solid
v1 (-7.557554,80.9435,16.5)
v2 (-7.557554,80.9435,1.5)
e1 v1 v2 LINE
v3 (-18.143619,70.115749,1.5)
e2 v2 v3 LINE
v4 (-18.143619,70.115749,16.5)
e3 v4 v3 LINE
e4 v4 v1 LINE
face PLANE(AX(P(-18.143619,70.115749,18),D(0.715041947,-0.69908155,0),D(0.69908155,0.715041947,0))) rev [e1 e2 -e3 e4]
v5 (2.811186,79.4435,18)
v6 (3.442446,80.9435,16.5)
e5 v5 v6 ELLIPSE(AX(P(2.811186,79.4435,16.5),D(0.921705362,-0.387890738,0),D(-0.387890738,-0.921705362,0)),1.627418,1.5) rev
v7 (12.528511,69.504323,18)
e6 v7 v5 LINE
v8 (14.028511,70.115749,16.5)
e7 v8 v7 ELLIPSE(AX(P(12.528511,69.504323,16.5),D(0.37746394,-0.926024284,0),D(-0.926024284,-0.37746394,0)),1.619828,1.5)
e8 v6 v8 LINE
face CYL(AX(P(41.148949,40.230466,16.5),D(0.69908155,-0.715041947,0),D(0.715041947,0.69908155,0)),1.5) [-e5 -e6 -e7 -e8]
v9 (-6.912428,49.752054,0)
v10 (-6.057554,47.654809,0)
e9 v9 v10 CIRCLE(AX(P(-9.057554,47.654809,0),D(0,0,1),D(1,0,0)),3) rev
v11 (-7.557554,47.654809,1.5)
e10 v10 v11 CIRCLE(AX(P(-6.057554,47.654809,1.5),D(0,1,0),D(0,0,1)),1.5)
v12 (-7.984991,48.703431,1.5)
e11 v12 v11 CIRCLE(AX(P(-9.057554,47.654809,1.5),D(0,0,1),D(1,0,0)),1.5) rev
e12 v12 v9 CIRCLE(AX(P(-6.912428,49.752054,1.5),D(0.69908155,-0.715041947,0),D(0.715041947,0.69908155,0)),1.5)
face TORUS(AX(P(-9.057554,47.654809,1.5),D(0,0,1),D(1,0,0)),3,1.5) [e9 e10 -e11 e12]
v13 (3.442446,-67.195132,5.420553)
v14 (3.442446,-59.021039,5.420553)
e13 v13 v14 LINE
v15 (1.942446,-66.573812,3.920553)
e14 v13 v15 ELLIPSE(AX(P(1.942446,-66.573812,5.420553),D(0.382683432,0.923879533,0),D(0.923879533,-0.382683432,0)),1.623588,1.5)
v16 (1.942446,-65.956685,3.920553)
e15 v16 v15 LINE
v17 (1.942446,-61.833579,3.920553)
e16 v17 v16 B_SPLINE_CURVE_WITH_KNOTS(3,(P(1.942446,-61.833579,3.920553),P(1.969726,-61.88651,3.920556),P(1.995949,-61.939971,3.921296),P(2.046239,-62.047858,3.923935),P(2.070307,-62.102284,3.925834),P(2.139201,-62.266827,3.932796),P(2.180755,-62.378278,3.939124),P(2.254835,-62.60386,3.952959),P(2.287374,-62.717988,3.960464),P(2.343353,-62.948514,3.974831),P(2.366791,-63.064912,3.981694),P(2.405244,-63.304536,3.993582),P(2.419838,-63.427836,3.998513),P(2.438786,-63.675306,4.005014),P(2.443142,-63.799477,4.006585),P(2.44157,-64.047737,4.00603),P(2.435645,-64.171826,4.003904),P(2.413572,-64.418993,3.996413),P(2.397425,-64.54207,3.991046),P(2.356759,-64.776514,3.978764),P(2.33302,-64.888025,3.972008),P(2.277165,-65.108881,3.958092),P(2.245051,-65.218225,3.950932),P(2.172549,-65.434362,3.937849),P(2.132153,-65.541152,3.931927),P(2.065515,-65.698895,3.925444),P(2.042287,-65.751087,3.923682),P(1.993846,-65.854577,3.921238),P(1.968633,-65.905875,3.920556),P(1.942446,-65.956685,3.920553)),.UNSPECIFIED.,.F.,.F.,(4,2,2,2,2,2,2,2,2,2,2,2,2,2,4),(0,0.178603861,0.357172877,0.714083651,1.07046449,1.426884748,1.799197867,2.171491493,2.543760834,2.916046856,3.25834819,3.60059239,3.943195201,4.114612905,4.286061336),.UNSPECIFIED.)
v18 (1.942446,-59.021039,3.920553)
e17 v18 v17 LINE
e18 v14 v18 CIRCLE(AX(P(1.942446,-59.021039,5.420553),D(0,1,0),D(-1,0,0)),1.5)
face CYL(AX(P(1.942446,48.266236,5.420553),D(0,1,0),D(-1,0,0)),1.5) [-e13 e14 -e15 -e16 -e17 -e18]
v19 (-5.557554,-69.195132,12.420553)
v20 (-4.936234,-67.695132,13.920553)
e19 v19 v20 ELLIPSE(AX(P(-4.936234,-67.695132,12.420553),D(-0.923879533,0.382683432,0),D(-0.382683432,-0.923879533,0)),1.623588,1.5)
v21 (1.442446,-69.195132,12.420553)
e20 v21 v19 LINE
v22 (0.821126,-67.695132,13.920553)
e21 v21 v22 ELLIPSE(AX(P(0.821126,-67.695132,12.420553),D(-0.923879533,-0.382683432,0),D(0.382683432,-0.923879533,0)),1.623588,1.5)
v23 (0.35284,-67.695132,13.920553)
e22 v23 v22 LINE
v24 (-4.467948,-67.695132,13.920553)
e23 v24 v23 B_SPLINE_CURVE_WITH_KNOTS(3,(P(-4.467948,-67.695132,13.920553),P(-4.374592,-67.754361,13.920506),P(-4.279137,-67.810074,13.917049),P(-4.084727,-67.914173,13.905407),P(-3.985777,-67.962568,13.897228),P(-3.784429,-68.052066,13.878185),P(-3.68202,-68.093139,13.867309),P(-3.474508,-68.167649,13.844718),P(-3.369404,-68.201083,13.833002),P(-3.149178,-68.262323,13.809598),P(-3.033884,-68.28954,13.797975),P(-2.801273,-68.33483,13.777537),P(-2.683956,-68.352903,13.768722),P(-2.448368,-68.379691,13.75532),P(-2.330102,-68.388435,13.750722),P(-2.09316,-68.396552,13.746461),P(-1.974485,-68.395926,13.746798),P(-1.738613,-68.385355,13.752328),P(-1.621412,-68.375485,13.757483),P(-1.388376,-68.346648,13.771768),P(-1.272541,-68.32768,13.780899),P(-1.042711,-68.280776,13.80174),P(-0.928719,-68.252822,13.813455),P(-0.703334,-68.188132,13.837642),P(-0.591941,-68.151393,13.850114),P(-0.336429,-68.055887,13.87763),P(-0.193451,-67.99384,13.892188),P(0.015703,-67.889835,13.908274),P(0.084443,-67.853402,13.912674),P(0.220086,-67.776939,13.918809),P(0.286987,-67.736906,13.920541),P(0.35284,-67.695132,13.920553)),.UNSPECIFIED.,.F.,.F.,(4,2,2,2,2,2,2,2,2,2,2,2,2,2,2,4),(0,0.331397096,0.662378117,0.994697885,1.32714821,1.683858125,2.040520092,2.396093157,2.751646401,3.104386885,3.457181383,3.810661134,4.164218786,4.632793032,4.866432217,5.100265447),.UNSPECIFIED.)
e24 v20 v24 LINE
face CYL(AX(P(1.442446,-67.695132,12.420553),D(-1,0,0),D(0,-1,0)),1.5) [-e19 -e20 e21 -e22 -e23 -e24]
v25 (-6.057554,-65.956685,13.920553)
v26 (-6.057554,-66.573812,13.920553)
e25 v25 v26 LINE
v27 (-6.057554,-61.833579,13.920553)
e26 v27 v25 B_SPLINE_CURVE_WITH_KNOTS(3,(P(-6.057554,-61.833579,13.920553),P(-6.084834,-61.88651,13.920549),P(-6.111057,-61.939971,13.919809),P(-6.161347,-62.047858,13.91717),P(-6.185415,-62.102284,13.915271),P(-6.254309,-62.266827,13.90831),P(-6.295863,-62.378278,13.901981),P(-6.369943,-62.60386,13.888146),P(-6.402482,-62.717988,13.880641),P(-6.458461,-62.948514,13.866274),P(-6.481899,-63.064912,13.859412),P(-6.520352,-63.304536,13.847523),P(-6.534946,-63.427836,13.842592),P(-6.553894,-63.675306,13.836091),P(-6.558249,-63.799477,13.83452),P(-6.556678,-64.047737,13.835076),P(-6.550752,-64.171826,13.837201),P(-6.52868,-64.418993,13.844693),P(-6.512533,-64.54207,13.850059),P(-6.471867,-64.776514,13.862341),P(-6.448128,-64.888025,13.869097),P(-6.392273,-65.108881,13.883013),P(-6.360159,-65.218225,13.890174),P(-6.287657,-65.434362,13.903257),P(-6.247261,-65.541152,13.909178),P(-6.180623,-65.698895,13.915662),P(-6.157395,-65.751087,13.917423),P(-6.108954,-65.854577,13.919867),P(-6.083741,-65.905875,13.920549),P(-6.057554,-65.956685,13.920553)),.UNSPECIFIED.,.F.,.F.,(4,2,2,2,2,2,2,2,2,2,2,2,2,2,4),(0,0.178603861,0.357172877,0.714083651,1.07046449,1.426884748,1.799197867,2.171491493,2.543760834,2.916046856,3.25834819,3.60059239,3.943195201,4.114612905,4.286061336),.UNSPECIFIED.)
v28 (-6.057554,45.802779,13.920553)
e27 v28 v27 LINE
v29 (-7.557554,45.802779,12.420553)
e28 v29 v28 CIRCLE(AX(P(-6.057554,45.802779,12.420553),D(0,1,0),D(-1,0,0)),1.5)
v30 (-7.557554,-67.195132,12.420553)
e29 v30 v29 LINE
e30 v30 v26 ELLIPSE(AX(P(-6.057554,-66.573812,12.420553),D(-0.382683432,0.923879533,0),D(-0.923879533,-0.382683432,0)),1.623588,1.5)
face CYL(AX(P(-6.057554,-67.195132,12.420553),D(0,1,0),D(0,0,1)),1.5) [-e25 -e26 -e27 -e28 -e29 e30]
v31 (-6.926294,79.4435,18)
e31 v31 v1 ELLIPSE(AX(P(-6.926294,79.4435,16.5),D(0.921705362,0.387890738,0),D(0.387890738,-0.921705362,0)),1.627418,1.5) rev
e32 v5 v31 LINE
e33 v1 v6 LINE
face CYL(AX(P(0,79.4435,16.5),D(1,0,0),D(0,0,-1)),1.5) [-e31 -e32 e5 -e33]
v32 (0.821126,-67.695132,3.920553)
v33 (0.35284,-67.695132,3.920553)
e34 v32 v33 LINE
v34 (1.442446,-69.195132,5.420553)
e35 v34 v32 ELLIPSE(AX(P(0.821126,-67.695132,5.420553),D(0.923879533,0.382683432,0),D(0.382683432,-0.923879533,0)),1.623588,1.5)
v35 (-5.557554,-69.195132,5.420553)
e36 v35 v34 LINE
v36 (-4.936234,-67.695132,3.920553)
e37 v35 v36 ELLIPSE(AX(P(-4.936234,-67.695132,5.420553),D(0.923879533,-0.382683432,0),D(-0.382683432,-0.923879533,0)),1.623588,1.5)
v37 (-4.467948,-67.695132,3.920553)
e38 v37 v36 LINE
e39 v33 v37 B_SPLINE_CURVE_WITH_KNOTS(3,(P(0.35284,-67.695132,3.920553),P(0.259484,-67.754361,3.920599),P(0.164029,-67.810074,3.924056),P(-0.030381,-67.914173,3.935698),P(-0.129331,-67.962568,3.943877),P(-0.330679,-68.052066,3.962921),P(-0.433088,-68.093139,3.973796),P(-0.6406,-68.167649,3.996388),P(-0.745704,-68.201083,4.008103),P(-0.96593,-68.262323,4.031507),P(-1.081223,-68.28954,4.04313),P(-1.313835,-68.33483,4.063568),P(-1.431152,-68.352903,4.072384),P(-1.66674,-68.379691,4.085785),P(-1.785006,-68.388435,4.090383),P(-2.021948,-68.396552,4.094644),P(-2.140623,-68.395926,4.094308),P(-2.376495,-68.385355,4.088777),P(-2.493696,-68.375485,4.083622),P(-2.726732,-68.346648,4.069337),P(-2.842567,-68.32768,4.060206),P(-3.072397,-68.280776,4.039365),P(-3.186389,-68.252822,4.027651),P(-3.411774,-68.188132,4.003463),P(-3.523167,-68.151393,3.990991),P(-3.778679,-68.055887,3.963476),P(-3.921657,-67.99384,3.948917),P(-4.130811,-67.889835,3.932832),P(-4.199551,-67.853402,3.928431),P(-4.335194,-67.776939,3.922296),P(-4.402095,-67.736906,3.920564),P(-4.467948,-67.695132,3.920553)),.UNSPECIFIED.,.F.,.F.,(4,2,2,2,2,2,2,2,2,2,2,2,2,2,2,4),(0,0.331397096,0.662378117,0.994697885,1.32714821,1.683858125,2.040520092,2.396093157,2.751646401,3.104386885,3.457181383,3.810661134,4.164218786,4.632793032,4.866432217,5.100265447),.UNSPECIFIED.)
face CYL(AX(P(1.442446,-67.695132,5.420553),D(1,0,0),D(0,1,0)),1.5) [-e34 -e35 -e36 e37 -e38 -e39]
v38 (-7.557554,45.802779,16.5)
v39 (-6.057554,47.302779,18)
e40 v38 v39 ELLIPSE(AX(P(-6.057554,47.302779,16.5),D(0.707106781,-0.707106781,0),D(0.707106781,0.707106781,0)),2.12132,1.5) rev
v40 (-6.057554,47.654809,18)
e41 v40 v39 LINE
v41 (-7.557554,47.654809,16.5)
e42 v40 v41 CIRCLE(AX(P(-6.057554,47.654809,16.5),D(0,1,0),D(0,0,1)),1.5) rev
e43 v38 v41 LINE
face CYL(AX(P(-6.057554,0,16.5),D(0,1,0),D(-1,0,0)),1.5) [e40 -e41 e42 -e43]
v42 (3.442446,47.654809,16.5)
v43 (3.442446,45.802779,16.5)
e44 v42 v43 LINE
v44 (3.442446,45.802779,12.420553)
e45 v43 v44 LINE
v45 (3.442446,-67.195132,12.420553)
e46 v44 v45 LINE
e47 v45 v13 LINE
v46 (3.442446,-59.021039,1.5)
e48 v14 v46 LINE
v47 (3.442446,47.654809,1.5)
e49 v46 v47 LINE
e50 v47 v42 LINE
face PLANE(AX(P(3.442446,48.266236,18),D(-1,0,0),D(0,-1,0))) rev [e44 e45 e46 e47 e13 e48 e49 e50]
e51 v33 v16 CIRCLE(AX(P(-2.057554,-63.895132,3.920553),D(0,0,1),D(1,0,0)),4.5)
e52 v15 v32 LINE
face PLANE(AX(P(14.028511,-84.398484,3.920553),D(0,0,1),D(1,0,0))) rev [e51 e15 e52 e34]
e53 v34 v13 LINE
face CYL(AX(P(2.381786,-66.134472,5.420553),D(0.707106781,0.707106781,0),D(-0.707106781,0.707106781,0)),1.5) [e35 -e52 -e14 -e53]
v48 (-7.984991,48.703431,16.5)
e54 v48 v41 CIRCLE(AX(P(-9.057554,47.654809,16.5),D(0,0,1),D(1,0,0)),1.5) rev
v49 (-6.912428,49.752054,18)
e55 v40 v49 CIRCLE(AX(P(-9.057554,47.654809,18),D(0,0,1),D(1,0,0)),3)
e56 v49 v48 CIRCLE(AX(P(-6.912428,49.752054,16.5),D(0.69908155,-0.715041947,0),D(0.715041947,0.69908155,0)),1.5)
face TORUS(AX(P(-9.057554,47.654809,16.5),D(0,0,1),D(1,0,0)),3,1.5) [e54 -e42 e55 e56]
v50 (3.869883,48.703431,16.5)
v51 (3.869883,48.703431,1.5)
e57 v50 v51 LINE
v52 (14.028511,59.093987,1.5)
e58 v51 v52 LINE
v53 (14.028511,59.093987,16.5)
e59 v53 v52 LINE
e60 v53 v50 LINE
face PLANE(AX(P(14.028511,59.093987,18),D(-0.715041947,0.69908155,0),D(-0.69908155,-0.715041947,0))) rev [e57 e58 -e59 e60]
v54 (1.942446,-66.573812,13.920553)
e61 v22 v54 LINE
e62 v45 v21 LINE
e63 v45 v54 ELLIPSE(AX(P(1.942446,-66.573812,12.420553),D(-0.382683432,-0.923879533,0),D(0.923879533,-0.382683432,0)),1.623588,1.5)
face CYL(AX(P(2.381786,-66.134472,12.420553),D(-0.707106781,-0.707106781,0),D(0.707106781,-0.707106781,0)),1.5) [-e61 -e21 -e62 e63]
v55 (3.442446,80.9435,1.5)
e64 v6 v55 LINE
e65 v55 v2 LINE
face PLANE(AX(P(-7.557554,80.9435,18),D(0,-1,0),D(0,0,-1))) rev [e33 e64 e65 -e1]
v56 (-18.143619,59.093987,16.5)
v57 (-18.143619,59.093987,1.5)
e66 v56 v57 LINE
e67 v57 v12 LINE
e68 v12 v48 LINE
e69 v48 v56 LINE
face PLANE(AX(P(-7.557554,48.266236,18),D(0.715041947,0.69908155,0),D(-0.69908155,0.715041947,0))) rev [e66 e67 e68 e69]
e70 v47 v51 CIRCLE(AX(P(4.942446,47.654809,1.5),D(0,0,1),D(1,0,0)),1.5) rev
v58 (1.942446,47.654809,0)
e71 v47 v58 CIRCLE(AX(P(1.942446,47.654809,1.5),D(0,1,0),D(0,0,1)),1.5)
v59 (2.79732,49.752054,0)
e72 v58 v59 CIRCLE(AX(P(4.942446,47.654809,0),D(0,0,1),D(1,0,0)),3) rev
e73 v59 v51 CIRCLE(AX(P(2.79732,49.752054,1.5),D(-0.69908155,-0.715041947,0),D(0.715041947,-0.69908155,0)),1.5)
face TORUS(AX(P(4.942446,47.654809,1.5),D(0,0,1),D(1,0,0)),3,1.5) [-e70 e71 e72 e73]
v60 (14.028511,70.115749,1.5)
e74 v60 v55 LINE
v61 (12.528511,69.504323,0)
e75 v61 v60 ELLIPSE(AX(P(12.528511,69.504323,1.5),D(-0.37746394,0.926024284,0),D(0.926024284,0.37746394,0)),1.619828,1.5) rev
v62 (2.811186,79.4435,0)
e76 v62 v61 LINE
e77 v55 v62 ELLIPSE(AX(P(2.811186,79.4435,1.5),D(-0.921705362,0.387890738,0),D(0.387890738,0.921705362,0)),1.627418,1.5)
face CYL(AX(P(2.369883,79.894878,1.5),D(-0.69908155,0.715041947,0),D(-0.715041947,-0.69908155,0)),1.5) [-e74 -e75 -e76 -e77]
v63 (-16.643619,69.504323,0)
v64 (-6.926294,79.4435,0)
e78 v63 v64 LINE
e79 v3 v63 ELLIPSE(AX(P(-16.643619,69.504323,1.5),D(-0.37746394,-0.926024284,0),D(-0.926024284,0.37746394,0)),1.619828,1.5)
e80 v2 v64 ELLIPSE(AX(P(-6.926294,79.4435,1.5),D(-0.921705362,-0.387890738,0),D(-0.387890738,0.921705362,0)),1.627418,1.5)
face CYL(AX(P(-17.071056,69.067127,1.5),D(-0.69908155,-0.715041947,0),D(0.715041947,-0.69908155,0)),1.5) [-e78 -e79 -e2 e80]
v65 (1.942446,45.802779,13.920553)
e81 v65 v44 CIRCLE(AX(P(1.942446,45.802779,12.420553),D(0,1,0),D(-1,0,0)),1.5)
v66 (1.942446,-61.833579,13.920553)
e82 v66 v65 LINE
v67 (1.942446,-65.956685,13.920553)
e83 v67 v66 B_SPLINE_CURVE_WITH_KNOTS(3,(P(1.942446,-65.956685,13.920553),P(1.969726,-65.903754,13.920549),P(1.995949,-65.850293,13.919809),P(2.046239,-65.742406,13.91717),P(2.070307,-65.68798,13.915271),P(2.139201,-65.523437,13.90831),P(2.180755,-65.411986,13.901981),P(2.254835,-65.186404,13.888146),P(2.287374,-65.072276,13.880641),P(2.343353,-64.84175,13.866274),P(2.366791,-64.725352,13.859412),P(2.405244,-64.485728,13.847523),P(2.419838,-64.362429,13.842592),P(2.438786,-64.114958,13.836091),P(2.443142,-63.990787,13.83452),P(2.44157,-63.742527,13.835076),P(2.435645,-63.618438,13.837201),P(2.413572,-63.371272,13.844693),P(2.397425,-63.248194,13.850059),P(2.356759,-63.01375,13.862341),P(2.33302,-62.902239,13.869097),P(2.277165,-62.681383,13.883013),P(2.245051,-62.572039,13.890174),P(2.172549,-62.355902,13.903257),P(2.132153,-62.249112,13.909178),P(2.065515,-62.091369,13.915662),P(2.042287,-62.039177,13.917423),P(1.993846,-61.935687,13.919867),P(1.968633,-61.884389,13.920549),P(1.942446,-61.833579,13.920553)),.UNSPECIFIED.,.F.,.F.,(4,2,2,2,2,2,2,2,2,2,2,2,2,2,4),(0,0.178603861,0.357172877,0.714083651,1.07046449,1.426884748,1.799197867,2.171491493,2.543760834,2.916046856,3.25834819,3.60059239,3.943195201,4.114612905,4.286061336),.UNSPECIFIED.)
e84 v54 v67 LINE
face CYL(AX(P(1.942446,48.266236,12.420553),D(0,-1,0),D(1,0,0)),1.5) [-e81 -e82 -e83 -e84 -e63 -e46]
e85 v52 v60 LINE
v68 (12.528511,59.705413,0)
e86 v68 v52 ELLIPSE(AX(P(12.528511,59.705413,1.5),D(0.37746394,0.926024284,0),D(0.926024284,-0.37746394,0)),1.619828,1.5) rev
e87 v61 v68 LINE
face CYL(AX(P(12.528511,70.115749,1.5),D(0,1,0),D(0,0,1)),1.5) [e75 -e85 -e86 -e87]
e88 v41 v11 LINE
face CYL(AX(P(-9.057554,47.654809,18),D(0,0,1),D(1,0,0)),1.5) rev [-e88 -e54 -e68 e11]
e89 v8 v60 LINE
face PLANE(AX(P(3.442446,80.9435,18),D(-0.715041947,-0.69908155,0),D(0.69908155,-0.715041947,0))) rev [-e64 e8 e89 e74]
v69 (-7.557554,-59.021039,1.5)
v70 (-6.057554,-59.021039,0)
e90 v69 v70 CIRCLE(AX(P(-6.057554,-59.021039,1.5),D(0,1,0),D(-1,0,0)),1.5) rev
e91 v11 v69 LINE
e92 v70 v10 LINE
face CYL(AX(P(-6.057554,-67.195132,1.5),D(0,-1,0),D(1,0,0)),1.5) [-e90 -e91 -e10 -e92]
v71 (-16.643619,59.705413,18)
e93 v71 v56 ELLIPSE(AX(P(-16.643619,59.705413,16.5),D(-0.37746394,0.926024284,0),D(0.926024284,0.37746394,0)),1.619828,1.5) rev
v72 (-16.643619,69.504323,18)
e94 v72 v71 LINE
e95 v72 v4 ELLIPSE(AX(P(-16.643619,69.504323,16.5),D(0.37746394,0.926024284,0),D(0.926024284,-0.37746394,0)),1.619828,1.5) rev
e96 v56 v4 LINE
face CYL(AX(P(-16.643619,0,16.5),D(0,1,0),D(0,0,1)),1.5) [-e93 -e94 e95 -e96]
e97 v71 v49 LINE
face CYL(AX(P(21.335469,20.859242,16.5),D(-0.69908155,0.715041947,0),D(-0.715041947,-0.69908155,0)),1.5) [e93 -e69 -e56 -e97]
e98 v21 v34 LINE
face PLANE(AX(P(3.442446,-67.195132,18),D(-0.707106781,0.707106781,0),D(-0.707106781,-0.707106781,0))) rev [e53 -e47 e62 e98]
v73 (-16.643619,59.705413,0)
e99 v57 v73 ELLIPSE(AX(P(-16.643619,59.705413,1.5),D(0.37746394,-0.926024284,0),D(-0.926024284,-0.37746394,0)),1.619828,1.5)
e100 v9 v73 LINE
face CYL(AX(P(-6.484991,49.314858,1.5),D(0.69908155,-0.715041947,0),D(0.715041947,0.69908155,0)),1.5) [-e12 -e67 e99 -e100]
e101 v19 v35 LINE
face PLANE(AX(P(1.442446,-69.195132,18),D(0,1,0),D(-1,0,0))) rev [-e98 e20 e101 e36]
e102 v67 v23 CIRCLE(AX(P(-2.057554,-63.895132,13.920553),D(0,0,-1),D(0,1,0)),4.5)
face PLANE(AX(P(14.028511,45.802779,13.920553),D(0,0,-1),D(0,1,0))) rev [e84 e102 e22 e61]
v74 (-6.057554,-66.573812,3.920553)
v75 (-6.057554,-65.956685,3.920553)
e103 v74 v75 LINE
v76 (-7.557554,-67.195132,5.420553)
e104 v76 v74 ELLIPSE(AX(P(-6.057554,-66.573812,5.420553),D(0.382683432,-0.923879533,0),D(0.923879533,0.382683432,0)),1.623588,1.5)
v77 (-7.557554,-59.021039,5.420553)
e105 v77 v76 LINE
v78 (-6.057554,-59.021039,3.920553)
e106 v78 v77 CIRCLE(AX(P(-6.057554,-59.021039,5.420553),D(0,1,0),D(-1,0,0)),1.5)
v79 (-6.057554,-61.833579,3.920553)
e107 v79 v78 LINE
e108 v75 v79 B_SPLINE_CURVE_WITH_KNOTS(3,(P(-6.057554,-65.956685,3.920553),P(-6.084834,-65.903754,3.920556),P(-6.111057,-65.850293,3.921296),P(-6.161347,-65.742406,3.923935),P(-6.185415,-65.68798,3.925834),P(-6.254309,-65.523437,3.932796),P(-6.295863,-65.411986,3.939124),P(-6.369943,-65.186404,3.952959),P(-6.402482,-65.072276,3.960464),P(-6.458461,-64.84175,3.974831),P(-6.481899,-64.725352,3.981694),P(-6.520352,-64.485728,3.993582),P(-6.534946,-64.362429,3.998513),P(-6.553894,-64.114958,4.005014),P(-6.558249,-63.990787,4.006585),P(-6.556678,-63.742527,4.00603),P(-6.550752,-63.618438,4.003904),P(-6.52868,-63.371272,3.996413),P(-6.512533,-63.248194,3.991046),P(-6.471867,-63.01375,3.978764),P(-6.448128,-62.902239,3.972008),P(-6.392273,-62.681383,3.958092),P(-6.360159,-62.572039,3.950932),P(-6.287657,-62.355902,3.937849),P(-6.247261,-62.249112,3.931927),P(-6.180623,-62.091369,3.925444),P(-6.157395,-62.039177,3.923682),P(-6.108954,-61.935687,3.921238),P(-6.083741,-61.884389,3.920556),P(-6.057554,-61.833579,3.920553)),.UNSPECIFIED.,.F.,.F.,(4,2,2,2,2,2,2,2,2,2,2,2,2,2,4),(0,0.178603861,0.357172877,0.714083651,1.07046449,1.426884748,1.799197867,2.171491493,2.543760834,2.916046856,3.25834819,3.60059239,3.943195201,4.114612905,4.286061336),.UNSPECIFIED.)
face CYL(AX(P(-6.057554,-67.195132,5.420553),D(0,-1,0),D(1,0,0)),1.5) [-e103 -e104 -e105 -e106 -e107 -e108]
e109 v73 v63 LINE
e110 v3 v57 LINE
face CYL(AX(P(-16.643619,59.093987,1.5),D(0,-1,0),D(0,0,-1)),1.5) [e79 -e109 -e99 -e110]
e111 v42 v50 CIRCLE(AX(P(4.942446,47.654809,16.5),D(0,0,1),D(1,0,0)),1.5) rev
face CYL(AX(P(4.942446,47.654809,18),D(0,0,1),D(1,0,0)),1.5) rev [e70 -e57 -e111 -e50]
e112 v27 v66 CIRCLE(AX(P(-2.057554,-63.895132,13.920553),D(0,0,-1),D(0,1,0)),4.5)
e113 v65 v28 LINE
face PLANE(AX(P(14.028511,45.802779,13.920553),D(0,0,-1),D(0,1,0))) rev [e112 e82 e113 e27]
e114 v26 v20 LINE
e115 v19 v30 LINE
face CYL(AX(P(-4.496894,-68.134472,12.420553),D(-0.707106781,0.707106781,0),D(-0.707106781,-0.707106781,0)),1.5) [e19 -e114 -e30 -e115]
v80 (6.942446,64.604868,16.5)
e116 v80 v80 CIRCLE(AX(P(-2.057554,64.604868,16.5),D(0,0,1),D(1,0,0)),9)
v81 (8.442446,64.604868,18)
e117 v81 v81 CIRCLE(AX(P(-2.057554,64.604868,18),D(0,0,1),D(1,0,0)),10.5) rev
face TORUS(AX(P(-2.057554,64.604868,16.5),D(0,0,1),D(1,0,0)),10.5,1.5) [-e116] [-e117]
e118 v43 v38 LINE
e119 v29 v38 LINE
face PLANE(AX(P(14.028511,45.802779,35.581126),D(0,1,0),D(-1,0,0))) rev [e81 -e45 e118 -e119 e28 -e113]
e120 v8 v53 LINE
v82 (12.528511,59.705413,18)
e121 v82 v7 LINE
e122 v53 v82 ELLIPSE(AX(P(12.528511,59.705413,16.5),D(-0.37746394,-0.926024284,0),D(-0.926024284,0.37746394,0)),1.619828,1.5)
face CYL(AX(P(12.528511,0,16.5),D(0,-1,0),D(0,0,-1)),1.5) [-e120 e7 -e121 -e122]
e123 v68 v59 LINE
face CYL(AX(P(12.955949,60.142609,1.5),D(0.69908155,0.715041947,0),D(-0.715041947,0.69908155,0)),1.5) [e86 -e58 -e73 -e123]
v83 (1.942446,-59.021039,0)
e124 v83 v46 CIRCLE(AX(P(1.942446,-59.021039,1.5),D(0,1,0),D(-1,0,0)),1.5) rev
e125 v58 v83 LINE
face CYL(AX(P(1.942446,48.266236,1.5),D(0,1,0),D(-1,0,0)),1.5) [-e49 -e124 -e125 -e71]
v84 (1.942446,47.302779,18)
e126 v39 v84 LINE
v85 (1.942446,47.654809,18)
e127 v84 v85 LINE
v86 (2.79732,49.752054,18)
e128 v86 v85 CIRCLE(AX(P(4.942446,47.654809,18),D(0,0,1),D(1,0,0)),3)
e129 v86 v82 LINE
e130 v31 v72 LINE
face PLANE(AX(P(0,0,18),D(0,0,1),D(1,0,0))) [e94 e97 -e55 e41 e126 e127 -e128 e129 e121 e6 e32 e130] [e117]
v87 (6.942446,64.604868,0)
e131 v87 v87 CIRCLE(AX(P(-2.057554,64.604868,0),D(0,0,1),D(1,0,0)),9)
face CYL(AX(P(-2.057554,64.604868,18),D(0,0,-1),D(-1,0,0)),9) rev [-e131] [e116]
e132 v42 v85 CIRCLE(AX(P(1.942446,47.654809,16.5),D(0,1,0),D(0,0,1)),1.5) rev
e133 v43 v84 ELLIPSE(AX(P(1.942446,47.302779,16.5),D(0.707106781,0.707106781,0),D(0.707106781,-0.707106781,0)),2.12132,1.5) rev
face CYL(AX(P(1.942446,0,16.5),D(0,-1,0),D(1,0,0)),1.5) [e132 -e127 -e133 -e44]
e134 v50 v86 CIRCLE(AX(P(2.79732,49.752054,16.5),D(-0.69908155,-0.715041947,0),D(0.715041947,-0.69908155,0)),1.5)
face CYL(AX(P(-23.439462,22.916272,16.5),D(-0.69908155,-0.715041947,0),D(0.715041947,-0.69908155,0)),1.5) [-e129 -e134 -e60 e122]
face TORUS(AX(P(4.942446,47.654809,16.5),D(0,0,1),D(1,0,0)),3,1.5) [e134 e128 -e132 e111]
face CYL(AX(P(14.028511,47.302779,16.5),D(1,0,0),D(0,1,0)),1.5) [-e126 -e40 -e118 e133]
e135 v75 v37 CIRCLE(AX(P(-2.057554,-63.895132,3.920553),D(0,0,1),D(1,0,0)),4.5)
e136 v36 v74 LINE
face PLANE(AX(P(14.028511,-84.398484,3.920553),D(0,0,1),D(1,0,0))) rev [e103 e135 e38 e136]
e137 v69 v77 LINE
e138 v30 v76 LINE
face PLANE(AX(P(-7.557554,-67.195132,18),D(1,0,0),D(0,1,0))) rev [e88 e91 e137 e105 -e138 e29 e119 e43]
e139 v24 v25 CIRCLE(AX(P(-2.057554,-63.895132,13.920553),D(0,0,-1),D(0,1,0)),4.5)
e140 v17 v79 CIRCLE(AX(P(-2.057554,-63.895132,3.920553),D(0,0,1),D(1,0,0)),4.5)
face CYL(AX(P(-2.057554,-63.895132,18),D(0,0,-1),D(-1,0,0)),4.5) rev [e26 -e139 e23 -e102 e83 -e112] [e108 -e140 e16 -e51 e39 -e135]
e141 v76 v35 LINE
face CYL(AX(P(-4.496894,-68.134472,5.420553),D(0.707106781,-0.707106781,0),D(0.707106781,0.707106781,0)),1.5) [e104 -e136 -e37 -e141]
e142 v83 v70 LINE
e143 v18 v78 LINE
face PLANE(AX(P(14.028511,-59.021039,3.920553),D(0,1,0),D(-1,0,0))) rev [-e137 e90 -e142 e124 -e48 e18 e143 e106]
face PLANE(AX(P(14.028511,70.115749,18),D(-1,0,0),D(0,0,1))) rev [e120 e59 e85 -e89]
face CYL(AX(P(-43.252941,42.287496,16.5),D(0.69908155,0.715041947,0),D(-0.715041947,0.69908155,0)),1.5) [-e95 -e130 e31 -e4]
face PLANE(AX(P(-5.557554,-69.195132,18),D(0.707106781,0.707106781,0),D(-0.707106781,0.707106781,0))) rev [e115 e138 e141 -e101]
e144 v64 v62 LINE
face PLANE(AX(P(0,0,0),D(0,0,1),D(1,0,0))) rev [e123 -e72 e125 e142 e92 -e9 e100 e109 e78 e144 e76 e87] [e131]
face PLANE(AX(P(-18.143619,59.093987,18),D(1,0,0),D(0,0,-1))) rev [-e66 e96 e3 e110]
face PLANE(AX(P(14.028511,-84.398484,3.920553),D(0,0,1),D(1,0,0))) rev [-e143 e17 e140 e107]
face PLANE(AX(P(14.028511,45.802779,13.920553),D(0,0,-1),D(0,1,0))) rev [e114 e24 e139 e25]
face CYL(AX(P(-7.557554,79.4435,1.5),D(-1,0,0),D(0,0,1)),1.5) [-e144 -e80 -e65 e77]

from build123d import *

# Parameters (mm, degrees)
SKETCH1_R               = 9
SKETCH1_R_2             = 4.5
BOSS_EXTRUDE1_DEPTH     = 18
CUT_EXTRUDE1_DEPTH      = 86.684353416
CUT_EXTRUDE1_DEPTH_BACK = 86.684353416
FILLET1_R               = 1.5


with BuildPart() as part:
    # Sketch1 → Boss-Extrude1 (new body)
    with BuildSketch(Plane.XY):
        Polygon((-7.557553962, -67.195132078), (-7.557553962, 48.266235791), (-18.143619364, 59.093986602), (-18.143619364, 70.115749241), (-7.557553962, 80.943500052), (3.442446038, 80.943500052), (14.02851144, 70.115749241), (14.02851144, 59.093986602), (3.442446038, 48.266235791), (3.442446038, -67.195132078), (1.442446038, -69.195132078), (-5.557553962, -69.195132078), align=None)
        with Locations((-2.057553962, 64.604867922)):
            Circle(SKETCH1_R, mode=Mode.SUBTRACT)
        with Locations((-2.057553962, -63.895132078)):
            Circle(SKETCH1_R_2, mode=Mode.SUBTRACT)
    extrude(amount=BOSS_EXTRUDE1_DEPTH)

    # Sketch2 → Cut-Extrude1 (cut, two sides: drawn at the far end of the back side and taken through both)
    with BuildSketch(Plane.ZY.offset(7.557553962).offset(-CUT_EXTRUDE1_DEPTH_BACK)):
        Polygon((3.920552613, -84.398483755), (3.920552613, -59.021038695), (-18.582585697, -59.021038695), (-18.582585697, -119.504750135), (35.581125662, -119.504750135), (35.581125662, 45.802779434), (13.920552613, 45.802779434), (13.920552613, -84.398483755), align=None)
    extrude(amount=CUT_EXTRUDE1_DEPTH + CUT_EXTRUDE1_DEPTH_BACK, mode=Mode.SUBTRACT)

    # Fillet1
    # the kernel refuses this fillet: 1.5 mm, written as the material it adds along each edge
    with BuildSketch(Plane(origin=(3.442446038, 48.266235791, 0), x_dir=(0, -1, 0), z_dir=(0, 0, 1))) as fillet1_piece_1:
        with BuildLine():
            CenterArc((FILLET1_R * 0.407617755976, FILLET1_R), FILLET1_R, 225.646637005, 44.353362995)
            Line((-FILLET1_R * 0.291463794008, FILLET1_R * 0.284958052649), (0, 0))
            Line((0, 0), (FILLET1_R * 0.407617755976, 0))
        make_face()
    extrude(amount=18)
    with BuildSketch(Plane(origin=(-7.557553962, 48.266235791, 0), x_dir=(0, -1, 0), z_dir=(0, 0, 1))) as fillet1_piece_2:
        with BuildLine():
            CenterArc((FILLET1_R * 0.407617755976, -FILLET1_R), FILLET1_R, 90, 44.353362995)
            Line((-FILLET1_R * 0.291463794008, -FILLET1_R * 0.284958052649), (0, 0))
            Line((0, 0), (FILLET1_R * 0.407617755976, 0))
        make_face()
    extrude(amount=18)
    # the kernel refuses this fillet: 1.5 mm, written as the material it takes off along each edge
    with BuildSketch(Plane(origin=(-18.143619364, 55.343986602, 0), x_dir=(1, 0, 0), z_dir=(0, 1, 0)), Plane(origin=(14.02851144, 73.865749241, 0), x_dir=(-1, 0, 0), z_dir=(0, -1, 0))) as fillet1_2_piece_1:
        with BuildLine():
            CenterArc((FILLET1_R, -FILLET1_R), FILLET1_R, 90, 90)
            Line((0, -FILLET1_R), (0, 0))
            Line((0, 0), (FILLET1_R, 0))
        make_face()
    extrude(amount=18.521762639, mode=Mode.SUBTRACT)
    with BuildSketch(Plane(origin=(-20.765175176, 67.434341939, 0), x_dir=(0.7150419473513874, -0.6990815499839313, 0), z_dir=(0.6990815499839312, 0.7150419473513874, 0)), Plane(origin=(0.820890226, 83.624907355, 0), x_dir=(-0.7150419473513874, -0.6990815499839313, 0), z_dir=(0.6990815499839312, -0.7150419473513874, 0))) as fillet1_2_piece_2:
        with BuildLine():
            CenterArc((FILLET1_R, -FILLET1_R), FILLET1_R, 90, 90)
            Line((0, -FILLET1_R), (0, 0))
            Line((0, 0), (FILLET1_R, 0))
        make_face()
    extrude(amount=22.642819035, mode=Mode.SUBTRACT)
    with BuildSketch(Plane(origin=(-11.307553962, 80.943500052, 0), x_dir=(0, -1, 0), z_dir=(1, 0, 0))) as fillet1_2_piece_3:
        with BuildLine():
            CenterArc((FILLET1_R, -FILLET1_R), FILLET1_R, 90, 90)
            Line((0, -FILLET1_R), (0, 0))
            Line((0, 0), (FILLET1_R, 0))
        make_face()
    extrude(amount=18.5, mode=Mode.SUBTRACT)
    with BuildSketch(Plane(origin=(16.650067253, 61.775393905, 0), x_dir=(-0.7150419473513876, 0.699081549983931, 0), z_dir=(-0.699081549983931, -0.7150419473513876, 0)), Plane(origin=(-7.984991041, 48.703431482, 0), x_dir=(0.7150419473513876, 0.699081549983931, 0), z_dir=(-0.699081549983931, 0.7150419473513876, 0))) as fillet1_2_piece_4:
        with BuildLine():
            CenterArc((FILLET1_R, -FILLET1_R), FILLET1_R, 90, 90)
            Line((0, -FILLET1_R), (0, 0))
            Line((0, 0), (FILLET1_R, 0))
        make_face()
    extrude(amount=18.281392401, mode=Mode.SUBTRACT)
    with BuildSketch(Plane(origin=(-7.557553962, -62.771038695, 0), x_dir=(0, 0, 1), z_dir=(0, 1, 0))) as fillet1_2_piece_5:
        with BuildLine():
            CenterArc((FILLET1_R, FILLET1_R), FILLET1_R, 180, 90)
            Line((0, FILLET1_R), (0, 0))
            Line((0, 0), (FILLET1_R, 0))
        make_face()
    extrude(amount=110.425847852, mode=Mode.SUBTRACT)
    with BuildSketch(Plane(origin=(16.650067253, 61.775393905, 18), x_dir=(-0.7150419473513876, 0.699081549983931, 0), z_dir=(-0.699081549983931, -0.7150419473513876, 0)), Plane(origin=(-7.984991041, 48.703431482, 18), x_dir=(0.7150419473513876, 0.699081549983931, 0), z_dir=(-0.699081549983931, 0.7150419473513876, 0))) as fillet1_2_piece_6:
        with BuildLine():
            CenterArc((FILLET1_R, FILLET1_R), FILLET1_R, 180, 90)
            Line((0, FILLET1_R), (0, 0))
            Line((0, 0), (FILLET1_R, 0))
        make_face()
    extrude(amount=18.281392401, mode=Mode.SUBTRACT)
    with BuildSketch(Plane(origin=(-2.057553962, 64.604867922, 18), x_dir=(1, 0, 0), z_dir=(0, -1, 0))) as fillet1_2_piece_7:
        with BuildLine():
            CenterArc((9 + FILLET1_R, -FILLET1_R), FILLET1_R, 90, 90)
            Line((9, -FILLET1_R), (9, 0))
            Line((9, 0), (9 + FILLET1_R, 0))
        make_face()
    revolve(axis=Axis((-2.057553962, 64.604867922, 18), (0, 0, 1)), mode=Mode.SUBTRACT)
    with BuildSketch(Plane(origin=(14.02851144, 73.865749241, 18), x_dir=(-1, 0, 0), z_dir=(0, -1, 0)), Plane(origin=(-18.143619364, 55.343986602, 18), x_dir=(1, 0, 0), z_dir=(0, 1, 0))) as fillet1_2_piece_8:
        with BuildLine():
            CenterArc((FILLET1_R, FILLET1_R), FILLET1_R, 180, 90)
            Line((0, FILLET1_R), (0, 0))
            Line((0, 0), (FILLET1_R, 0))
        make_face()
    extrude(amount=18.521762639, mode=Mode.SUBTRACT)
    with BuildSketch(Plane(origin=(0.820890226, 83.624907355, 18), x_dir=(-0.7150419473513874, -0.6990815499839313, 0), z_dir=(0.6990815499839312, -0.7150419473513874, 0)), Plane(origin=(-20.765175176, 67.434341939, 18), x_dir=(0.7150419473513874, -0.6990815499839313, 0), z_dir=(0.6990815499839312, 0.7150419473513874, 0))) as fillet1_2_piece_9:
        with BuildLine():
            CenterArc((FILLET1_R, FILLET1_R), FILLET1_R, 180, 90)
            Line((0, FILLET1_R), (0, 0))
            Line((0, 0), (FILLET1_R, 0))
        make_face()
    extrude(amount=22.642819035, mode=Mode.SUBTRACT)
    with BuildSketch(Plane(origin=(-11.307553962, 80.943500052, 18), x_dir=(0, -1, 0), z_dir=(1, 0, 0)), Plane(origin=(7.192446038, 45.802779434, 18), x_dir=(0, 1, 0), z_dir=(-1, 0, 0))) as fillet1_2_piece_10:
        with BuildLine():
            CenterArc((FILLET1_R, FILLET1_R), FILLET1_R, 180, 90)
            Line((0, FILLET1_R), (0, 0))
            Line((0, 0), (FILLET1_R, 0))
        make_face()
    extrude(amount=18.5, mode=Mode.SUBTRACT)
    with BuildSketch(Plane(origin=(3.442446038, 47.654809157, 0), x_dir=(-1, 0, 0), z_dir=(0, -1, 0))) as fillet1_2_piece_11:
        with BuildLine():
            CenterArc((FILLET1_R, -FILLET1_R), FILLET1_R, 90, 90)
            Line((0, -FILLET1_R), (0, 0))
            Line((0, 0), (FILLET1_R, 0))
        make_face()
    extrude(amount=110.425847852, mode=Mode.SUBTRACT)
    with BuildSketch(Plane(origin=(3.442446038, 47.654809157, 18), x_dir=(-1, 0, 0), z_dir=(0, -1, 0))) as fillet1_2_piece_12:
        with BuildLine():
            CenterArc((FILLET1_R, FILLET1_R), FILLET1_R, 180, 90)
            Line((0, FILLET1_R), (0, 0))
            Line((0, 0), (FILLET1_R, 0))
        make_face()
    extrude(amount=5.602029724, mode=Mode.SUBTRACT)
    with BuildSketch(Plane(origin=(-2.905903532, -71.846782508, 13.920552613), x_dir=(0.7071067811865479, 0.707106781186547, 0), z_dir=(-0.7071067811865471, 0.707106781186548, 0)), Plane(origin=(6.094096468, -64.543481649, 13.920552613), x_dir=(-0.7071067811865501, 0.7071067811865448, 0), z_dir=(-0.7071067811865448, -0.7071067811865502, 0)), Plane(origin=(-1.209204391, -71.846782508, 3.920552613), x_dir=(-0.7071067811865502, 0.7071067811865449, 0), z_dir=(0.7071067811865448, 0.7071067811865502, 0))) as fillet1_2_piece_13:
        with BuildLine():
            CenterArc((FILLET1_R, FILLET1_R), FILLET1_R, 180, 90)
            Line((0, FILLET1_R), (0, 0))
            Line((0, 0), (FILLET1_R, 0))
        make_face()
    extrude(amount=10.328427125, mode=Mode.SUBTRACT)
    with BuildSketch(Plane(origin=(-7.557553962, -70.945132078, 13.920552613), x_dir=(0, 0, -1), z_dir=(0, 1, 0))) as fillet1_2_piece_14:
        with BuildLine():
            CenterArc((FILLET1_R, -FILLET1_R), FILLET1_R, 90, 90)
            Line((0, -FILLET1_R), (0, 0))
            Line((0, 0), (FILLET1_R, 0))
        make_face()
    extrude(amount=116.747911512, mode=Mode.SUBTRACT)
    with BuildSketch(Plane(origin=(3.442446038, 45.802779434, 13.920552613), x_dir=(-1, 0, 0), z_dir=(0, -1, 0))) as fillet1_2_piece_15:
        with BuildLine():
            CenterArc((FILLET1_R, FILLET1_R), FILLET1_R, 180, 90)
            Line((0, FILLET1_R), (0, 0))
            Line((0, 0), (FILLET1_R, 0))
        make_face()
    extrude(amount=116.747911512, mode=Mode.SUBTRACT)
    with BuildSketch(Plane(origin=(5.192446038, -69.195132078, 13.920552613), x_dir=(0, 1, 0), z_dir=(-1, 0, 0)), Plane(origin=(-9.307553962, -69.195132078, 3.920552613), x_dir=(0, 1, 0), z_dir=(1, 0, 0))) as fillet1_2_piece_16:
        with BuildLine():
            CenterArc((FILLET1_R, FILLET1_R), FILLET1_R, 180, 90)
            Line((0, FILLET1_R), (0, 0))
            Line((0, 0), (FILLET1_R, 0))
        make_face()
    extrude(amount=14.5, mode=Mode.SUBTRACT)
    with BuildSketch(Plane(origin=(-7.557553962, -59.021038695, 3.920552613), x_dir=(0, 0, 1), z_dir=(0, -1, 0))) as fillet1_2_piece_17:
        with BuildLine():
            CenterArc((FILLET1_R, -FILLET1_R), FILLET1_R, 90, 90)
            Line((0, -FILLET1_R), (0, 0))
            Line((0, 0), (FILLET1_R, 0))
        make_face()
    extrude(amount=11.924093383, mode=Mode.SUBTRACT)
    with BuildSketch(Plane(origin=(-10.209204391, -64.543481649, 3.920552613), x_dir=(0, 0, 1), z_dir=(0.7071067811865471, -0.707106781186548, 0))) as fillet1_2_piece_18:
        with BuildLine():
            CenterArc((FILLET1_R, -FILLET1_R), FILLET1_R, 90, 90)
            Line((0, -FILLET1_R), (0, 0))
            Line((0, 0), (FILLET1_R, 0))
        make_face()
    extrude(amount=10.328427125, mode=Mode.SUBTRACT)
    with BuildSketch(Plane(origin=(3.442446038, -70.945132078, 3.920552613), x_dir=(-1, 0, 0), z_dir=(0, 1, 0))) as fillet1_2_piece_19:
        with BuildLine():
            CenterArc((FILLET1_R, FILLET1_R), FILLET1_R, 180, 90)
            Line((0, FILLET1_R), (0, 0))
            Line((0, 0), (FILLET1_R, 0))
        make_face()
    extrude(amount=11.924093383, mode=Mode.SUBTRACT)
    with BuildSketch(Plane(origin=(-7.557553962, 42.052779434, 18), x_dir=(0, 0, -1), z_dir=(0, 1, 0))) as fillet1_2_piece_20:
        with BuildLine():
            CenterArc((FILLET1_R, -FILLET1_R), FILLET1_R, 90, 90)
            Line((0, -FILLET1_R), (0, 0))
            Line((0, 0), (FILLET1_R, 0))
        make_face()
    extrude(amount=5.602029724, mode=Mode.SUBTRACT)
    with BuildSketch(Plane(origin=(-9.057553962, 47.654809157, 18), x_dir=(1, 0, 0), z_dir=(0, -1, 0))) as fillet1_2_piece_21:
        with BuildLine():
            CenterArc((1.5 + FILLET1_R, -FILLET1_R), FILLET1_R, 90, 90)
            Line((1.5 + FILLET1_R, 0), (1.5, 0))
            Line((1.5, 0), (1.5, -FILLET1_R))
        make_face()
    revolve(axis=Axis((-9.057553962, 47.654809157, 18), (0, 0, 1)), revolution_arc=44.353362995, mode=Mode.SUBTRACT)
    with BuildSketch(Plane(origin=(4.942446038, 47.654809157, 18), x_dir=(-1, 0, 0), z_dir=(0, -1, 0))) as fillet1_2_piece_22:
        with BuildLine():
            CenterArc((1.5 + FILLET1_R, FILLET1_R), FILLET1_R, 180, 90)
            Line((1.5, FILLET1_R), (1.5, 0))
            Line((1.5, 0), (1.5 + FILLET1_R, 0))
        make_face()
    revolve(axis=Axis((4.942446038, 47.654809157, 18), (0, 0, -1)), revolution_arc=44.353362995, mode=Mode.SUBTRACT)
    with BuildSketch(Plane(origin=(4.942446038, 47.654809157, 0), x_dir=(-1, 0, 0), z_dir=(0, -1, 0))) as fillet1_2_piece_23:
        with BuildLine():
            CenterArc((1.5 + FILLET1_R, -FILLET1_R), FILLET1_R, 90, 90)
            Line((1.5, -FILLET1_R), (1.5, 0))
            Line((1.5, 0), (1.5 + FILLET1_R, 0))
        make_face()
    revolve(axis=Axis((4.942446038, 47.654809157, 0), (0, 0, -1)), revolution_arc=44.353362995, mode=Mode.SUBTRACT)
    with BuildSketch(Plane(origin=(-9.057553962, 47.654809157, 0), x_dir=(1, 0, 0), z_dir=(0, -1, 0))) as fillet1_2_piece_24:
        with BuildLine():
            CenterArc((1.5 + FILLET1_R, FILLET1_R), FILLET1_R, 180, 90)
            Line((1.5, FILLET1_R), (1.5, 0))
            Line((1.5, 0), (1.5 + FILLET1_R, 0))
        make_face()
    revolve(axis=Axis((-9.057553962, 47.654809157, 0), (0, 0, 1)), revolution_arc=44.353362995, mode=Mode.SUBTRACT)


solid = part.part
